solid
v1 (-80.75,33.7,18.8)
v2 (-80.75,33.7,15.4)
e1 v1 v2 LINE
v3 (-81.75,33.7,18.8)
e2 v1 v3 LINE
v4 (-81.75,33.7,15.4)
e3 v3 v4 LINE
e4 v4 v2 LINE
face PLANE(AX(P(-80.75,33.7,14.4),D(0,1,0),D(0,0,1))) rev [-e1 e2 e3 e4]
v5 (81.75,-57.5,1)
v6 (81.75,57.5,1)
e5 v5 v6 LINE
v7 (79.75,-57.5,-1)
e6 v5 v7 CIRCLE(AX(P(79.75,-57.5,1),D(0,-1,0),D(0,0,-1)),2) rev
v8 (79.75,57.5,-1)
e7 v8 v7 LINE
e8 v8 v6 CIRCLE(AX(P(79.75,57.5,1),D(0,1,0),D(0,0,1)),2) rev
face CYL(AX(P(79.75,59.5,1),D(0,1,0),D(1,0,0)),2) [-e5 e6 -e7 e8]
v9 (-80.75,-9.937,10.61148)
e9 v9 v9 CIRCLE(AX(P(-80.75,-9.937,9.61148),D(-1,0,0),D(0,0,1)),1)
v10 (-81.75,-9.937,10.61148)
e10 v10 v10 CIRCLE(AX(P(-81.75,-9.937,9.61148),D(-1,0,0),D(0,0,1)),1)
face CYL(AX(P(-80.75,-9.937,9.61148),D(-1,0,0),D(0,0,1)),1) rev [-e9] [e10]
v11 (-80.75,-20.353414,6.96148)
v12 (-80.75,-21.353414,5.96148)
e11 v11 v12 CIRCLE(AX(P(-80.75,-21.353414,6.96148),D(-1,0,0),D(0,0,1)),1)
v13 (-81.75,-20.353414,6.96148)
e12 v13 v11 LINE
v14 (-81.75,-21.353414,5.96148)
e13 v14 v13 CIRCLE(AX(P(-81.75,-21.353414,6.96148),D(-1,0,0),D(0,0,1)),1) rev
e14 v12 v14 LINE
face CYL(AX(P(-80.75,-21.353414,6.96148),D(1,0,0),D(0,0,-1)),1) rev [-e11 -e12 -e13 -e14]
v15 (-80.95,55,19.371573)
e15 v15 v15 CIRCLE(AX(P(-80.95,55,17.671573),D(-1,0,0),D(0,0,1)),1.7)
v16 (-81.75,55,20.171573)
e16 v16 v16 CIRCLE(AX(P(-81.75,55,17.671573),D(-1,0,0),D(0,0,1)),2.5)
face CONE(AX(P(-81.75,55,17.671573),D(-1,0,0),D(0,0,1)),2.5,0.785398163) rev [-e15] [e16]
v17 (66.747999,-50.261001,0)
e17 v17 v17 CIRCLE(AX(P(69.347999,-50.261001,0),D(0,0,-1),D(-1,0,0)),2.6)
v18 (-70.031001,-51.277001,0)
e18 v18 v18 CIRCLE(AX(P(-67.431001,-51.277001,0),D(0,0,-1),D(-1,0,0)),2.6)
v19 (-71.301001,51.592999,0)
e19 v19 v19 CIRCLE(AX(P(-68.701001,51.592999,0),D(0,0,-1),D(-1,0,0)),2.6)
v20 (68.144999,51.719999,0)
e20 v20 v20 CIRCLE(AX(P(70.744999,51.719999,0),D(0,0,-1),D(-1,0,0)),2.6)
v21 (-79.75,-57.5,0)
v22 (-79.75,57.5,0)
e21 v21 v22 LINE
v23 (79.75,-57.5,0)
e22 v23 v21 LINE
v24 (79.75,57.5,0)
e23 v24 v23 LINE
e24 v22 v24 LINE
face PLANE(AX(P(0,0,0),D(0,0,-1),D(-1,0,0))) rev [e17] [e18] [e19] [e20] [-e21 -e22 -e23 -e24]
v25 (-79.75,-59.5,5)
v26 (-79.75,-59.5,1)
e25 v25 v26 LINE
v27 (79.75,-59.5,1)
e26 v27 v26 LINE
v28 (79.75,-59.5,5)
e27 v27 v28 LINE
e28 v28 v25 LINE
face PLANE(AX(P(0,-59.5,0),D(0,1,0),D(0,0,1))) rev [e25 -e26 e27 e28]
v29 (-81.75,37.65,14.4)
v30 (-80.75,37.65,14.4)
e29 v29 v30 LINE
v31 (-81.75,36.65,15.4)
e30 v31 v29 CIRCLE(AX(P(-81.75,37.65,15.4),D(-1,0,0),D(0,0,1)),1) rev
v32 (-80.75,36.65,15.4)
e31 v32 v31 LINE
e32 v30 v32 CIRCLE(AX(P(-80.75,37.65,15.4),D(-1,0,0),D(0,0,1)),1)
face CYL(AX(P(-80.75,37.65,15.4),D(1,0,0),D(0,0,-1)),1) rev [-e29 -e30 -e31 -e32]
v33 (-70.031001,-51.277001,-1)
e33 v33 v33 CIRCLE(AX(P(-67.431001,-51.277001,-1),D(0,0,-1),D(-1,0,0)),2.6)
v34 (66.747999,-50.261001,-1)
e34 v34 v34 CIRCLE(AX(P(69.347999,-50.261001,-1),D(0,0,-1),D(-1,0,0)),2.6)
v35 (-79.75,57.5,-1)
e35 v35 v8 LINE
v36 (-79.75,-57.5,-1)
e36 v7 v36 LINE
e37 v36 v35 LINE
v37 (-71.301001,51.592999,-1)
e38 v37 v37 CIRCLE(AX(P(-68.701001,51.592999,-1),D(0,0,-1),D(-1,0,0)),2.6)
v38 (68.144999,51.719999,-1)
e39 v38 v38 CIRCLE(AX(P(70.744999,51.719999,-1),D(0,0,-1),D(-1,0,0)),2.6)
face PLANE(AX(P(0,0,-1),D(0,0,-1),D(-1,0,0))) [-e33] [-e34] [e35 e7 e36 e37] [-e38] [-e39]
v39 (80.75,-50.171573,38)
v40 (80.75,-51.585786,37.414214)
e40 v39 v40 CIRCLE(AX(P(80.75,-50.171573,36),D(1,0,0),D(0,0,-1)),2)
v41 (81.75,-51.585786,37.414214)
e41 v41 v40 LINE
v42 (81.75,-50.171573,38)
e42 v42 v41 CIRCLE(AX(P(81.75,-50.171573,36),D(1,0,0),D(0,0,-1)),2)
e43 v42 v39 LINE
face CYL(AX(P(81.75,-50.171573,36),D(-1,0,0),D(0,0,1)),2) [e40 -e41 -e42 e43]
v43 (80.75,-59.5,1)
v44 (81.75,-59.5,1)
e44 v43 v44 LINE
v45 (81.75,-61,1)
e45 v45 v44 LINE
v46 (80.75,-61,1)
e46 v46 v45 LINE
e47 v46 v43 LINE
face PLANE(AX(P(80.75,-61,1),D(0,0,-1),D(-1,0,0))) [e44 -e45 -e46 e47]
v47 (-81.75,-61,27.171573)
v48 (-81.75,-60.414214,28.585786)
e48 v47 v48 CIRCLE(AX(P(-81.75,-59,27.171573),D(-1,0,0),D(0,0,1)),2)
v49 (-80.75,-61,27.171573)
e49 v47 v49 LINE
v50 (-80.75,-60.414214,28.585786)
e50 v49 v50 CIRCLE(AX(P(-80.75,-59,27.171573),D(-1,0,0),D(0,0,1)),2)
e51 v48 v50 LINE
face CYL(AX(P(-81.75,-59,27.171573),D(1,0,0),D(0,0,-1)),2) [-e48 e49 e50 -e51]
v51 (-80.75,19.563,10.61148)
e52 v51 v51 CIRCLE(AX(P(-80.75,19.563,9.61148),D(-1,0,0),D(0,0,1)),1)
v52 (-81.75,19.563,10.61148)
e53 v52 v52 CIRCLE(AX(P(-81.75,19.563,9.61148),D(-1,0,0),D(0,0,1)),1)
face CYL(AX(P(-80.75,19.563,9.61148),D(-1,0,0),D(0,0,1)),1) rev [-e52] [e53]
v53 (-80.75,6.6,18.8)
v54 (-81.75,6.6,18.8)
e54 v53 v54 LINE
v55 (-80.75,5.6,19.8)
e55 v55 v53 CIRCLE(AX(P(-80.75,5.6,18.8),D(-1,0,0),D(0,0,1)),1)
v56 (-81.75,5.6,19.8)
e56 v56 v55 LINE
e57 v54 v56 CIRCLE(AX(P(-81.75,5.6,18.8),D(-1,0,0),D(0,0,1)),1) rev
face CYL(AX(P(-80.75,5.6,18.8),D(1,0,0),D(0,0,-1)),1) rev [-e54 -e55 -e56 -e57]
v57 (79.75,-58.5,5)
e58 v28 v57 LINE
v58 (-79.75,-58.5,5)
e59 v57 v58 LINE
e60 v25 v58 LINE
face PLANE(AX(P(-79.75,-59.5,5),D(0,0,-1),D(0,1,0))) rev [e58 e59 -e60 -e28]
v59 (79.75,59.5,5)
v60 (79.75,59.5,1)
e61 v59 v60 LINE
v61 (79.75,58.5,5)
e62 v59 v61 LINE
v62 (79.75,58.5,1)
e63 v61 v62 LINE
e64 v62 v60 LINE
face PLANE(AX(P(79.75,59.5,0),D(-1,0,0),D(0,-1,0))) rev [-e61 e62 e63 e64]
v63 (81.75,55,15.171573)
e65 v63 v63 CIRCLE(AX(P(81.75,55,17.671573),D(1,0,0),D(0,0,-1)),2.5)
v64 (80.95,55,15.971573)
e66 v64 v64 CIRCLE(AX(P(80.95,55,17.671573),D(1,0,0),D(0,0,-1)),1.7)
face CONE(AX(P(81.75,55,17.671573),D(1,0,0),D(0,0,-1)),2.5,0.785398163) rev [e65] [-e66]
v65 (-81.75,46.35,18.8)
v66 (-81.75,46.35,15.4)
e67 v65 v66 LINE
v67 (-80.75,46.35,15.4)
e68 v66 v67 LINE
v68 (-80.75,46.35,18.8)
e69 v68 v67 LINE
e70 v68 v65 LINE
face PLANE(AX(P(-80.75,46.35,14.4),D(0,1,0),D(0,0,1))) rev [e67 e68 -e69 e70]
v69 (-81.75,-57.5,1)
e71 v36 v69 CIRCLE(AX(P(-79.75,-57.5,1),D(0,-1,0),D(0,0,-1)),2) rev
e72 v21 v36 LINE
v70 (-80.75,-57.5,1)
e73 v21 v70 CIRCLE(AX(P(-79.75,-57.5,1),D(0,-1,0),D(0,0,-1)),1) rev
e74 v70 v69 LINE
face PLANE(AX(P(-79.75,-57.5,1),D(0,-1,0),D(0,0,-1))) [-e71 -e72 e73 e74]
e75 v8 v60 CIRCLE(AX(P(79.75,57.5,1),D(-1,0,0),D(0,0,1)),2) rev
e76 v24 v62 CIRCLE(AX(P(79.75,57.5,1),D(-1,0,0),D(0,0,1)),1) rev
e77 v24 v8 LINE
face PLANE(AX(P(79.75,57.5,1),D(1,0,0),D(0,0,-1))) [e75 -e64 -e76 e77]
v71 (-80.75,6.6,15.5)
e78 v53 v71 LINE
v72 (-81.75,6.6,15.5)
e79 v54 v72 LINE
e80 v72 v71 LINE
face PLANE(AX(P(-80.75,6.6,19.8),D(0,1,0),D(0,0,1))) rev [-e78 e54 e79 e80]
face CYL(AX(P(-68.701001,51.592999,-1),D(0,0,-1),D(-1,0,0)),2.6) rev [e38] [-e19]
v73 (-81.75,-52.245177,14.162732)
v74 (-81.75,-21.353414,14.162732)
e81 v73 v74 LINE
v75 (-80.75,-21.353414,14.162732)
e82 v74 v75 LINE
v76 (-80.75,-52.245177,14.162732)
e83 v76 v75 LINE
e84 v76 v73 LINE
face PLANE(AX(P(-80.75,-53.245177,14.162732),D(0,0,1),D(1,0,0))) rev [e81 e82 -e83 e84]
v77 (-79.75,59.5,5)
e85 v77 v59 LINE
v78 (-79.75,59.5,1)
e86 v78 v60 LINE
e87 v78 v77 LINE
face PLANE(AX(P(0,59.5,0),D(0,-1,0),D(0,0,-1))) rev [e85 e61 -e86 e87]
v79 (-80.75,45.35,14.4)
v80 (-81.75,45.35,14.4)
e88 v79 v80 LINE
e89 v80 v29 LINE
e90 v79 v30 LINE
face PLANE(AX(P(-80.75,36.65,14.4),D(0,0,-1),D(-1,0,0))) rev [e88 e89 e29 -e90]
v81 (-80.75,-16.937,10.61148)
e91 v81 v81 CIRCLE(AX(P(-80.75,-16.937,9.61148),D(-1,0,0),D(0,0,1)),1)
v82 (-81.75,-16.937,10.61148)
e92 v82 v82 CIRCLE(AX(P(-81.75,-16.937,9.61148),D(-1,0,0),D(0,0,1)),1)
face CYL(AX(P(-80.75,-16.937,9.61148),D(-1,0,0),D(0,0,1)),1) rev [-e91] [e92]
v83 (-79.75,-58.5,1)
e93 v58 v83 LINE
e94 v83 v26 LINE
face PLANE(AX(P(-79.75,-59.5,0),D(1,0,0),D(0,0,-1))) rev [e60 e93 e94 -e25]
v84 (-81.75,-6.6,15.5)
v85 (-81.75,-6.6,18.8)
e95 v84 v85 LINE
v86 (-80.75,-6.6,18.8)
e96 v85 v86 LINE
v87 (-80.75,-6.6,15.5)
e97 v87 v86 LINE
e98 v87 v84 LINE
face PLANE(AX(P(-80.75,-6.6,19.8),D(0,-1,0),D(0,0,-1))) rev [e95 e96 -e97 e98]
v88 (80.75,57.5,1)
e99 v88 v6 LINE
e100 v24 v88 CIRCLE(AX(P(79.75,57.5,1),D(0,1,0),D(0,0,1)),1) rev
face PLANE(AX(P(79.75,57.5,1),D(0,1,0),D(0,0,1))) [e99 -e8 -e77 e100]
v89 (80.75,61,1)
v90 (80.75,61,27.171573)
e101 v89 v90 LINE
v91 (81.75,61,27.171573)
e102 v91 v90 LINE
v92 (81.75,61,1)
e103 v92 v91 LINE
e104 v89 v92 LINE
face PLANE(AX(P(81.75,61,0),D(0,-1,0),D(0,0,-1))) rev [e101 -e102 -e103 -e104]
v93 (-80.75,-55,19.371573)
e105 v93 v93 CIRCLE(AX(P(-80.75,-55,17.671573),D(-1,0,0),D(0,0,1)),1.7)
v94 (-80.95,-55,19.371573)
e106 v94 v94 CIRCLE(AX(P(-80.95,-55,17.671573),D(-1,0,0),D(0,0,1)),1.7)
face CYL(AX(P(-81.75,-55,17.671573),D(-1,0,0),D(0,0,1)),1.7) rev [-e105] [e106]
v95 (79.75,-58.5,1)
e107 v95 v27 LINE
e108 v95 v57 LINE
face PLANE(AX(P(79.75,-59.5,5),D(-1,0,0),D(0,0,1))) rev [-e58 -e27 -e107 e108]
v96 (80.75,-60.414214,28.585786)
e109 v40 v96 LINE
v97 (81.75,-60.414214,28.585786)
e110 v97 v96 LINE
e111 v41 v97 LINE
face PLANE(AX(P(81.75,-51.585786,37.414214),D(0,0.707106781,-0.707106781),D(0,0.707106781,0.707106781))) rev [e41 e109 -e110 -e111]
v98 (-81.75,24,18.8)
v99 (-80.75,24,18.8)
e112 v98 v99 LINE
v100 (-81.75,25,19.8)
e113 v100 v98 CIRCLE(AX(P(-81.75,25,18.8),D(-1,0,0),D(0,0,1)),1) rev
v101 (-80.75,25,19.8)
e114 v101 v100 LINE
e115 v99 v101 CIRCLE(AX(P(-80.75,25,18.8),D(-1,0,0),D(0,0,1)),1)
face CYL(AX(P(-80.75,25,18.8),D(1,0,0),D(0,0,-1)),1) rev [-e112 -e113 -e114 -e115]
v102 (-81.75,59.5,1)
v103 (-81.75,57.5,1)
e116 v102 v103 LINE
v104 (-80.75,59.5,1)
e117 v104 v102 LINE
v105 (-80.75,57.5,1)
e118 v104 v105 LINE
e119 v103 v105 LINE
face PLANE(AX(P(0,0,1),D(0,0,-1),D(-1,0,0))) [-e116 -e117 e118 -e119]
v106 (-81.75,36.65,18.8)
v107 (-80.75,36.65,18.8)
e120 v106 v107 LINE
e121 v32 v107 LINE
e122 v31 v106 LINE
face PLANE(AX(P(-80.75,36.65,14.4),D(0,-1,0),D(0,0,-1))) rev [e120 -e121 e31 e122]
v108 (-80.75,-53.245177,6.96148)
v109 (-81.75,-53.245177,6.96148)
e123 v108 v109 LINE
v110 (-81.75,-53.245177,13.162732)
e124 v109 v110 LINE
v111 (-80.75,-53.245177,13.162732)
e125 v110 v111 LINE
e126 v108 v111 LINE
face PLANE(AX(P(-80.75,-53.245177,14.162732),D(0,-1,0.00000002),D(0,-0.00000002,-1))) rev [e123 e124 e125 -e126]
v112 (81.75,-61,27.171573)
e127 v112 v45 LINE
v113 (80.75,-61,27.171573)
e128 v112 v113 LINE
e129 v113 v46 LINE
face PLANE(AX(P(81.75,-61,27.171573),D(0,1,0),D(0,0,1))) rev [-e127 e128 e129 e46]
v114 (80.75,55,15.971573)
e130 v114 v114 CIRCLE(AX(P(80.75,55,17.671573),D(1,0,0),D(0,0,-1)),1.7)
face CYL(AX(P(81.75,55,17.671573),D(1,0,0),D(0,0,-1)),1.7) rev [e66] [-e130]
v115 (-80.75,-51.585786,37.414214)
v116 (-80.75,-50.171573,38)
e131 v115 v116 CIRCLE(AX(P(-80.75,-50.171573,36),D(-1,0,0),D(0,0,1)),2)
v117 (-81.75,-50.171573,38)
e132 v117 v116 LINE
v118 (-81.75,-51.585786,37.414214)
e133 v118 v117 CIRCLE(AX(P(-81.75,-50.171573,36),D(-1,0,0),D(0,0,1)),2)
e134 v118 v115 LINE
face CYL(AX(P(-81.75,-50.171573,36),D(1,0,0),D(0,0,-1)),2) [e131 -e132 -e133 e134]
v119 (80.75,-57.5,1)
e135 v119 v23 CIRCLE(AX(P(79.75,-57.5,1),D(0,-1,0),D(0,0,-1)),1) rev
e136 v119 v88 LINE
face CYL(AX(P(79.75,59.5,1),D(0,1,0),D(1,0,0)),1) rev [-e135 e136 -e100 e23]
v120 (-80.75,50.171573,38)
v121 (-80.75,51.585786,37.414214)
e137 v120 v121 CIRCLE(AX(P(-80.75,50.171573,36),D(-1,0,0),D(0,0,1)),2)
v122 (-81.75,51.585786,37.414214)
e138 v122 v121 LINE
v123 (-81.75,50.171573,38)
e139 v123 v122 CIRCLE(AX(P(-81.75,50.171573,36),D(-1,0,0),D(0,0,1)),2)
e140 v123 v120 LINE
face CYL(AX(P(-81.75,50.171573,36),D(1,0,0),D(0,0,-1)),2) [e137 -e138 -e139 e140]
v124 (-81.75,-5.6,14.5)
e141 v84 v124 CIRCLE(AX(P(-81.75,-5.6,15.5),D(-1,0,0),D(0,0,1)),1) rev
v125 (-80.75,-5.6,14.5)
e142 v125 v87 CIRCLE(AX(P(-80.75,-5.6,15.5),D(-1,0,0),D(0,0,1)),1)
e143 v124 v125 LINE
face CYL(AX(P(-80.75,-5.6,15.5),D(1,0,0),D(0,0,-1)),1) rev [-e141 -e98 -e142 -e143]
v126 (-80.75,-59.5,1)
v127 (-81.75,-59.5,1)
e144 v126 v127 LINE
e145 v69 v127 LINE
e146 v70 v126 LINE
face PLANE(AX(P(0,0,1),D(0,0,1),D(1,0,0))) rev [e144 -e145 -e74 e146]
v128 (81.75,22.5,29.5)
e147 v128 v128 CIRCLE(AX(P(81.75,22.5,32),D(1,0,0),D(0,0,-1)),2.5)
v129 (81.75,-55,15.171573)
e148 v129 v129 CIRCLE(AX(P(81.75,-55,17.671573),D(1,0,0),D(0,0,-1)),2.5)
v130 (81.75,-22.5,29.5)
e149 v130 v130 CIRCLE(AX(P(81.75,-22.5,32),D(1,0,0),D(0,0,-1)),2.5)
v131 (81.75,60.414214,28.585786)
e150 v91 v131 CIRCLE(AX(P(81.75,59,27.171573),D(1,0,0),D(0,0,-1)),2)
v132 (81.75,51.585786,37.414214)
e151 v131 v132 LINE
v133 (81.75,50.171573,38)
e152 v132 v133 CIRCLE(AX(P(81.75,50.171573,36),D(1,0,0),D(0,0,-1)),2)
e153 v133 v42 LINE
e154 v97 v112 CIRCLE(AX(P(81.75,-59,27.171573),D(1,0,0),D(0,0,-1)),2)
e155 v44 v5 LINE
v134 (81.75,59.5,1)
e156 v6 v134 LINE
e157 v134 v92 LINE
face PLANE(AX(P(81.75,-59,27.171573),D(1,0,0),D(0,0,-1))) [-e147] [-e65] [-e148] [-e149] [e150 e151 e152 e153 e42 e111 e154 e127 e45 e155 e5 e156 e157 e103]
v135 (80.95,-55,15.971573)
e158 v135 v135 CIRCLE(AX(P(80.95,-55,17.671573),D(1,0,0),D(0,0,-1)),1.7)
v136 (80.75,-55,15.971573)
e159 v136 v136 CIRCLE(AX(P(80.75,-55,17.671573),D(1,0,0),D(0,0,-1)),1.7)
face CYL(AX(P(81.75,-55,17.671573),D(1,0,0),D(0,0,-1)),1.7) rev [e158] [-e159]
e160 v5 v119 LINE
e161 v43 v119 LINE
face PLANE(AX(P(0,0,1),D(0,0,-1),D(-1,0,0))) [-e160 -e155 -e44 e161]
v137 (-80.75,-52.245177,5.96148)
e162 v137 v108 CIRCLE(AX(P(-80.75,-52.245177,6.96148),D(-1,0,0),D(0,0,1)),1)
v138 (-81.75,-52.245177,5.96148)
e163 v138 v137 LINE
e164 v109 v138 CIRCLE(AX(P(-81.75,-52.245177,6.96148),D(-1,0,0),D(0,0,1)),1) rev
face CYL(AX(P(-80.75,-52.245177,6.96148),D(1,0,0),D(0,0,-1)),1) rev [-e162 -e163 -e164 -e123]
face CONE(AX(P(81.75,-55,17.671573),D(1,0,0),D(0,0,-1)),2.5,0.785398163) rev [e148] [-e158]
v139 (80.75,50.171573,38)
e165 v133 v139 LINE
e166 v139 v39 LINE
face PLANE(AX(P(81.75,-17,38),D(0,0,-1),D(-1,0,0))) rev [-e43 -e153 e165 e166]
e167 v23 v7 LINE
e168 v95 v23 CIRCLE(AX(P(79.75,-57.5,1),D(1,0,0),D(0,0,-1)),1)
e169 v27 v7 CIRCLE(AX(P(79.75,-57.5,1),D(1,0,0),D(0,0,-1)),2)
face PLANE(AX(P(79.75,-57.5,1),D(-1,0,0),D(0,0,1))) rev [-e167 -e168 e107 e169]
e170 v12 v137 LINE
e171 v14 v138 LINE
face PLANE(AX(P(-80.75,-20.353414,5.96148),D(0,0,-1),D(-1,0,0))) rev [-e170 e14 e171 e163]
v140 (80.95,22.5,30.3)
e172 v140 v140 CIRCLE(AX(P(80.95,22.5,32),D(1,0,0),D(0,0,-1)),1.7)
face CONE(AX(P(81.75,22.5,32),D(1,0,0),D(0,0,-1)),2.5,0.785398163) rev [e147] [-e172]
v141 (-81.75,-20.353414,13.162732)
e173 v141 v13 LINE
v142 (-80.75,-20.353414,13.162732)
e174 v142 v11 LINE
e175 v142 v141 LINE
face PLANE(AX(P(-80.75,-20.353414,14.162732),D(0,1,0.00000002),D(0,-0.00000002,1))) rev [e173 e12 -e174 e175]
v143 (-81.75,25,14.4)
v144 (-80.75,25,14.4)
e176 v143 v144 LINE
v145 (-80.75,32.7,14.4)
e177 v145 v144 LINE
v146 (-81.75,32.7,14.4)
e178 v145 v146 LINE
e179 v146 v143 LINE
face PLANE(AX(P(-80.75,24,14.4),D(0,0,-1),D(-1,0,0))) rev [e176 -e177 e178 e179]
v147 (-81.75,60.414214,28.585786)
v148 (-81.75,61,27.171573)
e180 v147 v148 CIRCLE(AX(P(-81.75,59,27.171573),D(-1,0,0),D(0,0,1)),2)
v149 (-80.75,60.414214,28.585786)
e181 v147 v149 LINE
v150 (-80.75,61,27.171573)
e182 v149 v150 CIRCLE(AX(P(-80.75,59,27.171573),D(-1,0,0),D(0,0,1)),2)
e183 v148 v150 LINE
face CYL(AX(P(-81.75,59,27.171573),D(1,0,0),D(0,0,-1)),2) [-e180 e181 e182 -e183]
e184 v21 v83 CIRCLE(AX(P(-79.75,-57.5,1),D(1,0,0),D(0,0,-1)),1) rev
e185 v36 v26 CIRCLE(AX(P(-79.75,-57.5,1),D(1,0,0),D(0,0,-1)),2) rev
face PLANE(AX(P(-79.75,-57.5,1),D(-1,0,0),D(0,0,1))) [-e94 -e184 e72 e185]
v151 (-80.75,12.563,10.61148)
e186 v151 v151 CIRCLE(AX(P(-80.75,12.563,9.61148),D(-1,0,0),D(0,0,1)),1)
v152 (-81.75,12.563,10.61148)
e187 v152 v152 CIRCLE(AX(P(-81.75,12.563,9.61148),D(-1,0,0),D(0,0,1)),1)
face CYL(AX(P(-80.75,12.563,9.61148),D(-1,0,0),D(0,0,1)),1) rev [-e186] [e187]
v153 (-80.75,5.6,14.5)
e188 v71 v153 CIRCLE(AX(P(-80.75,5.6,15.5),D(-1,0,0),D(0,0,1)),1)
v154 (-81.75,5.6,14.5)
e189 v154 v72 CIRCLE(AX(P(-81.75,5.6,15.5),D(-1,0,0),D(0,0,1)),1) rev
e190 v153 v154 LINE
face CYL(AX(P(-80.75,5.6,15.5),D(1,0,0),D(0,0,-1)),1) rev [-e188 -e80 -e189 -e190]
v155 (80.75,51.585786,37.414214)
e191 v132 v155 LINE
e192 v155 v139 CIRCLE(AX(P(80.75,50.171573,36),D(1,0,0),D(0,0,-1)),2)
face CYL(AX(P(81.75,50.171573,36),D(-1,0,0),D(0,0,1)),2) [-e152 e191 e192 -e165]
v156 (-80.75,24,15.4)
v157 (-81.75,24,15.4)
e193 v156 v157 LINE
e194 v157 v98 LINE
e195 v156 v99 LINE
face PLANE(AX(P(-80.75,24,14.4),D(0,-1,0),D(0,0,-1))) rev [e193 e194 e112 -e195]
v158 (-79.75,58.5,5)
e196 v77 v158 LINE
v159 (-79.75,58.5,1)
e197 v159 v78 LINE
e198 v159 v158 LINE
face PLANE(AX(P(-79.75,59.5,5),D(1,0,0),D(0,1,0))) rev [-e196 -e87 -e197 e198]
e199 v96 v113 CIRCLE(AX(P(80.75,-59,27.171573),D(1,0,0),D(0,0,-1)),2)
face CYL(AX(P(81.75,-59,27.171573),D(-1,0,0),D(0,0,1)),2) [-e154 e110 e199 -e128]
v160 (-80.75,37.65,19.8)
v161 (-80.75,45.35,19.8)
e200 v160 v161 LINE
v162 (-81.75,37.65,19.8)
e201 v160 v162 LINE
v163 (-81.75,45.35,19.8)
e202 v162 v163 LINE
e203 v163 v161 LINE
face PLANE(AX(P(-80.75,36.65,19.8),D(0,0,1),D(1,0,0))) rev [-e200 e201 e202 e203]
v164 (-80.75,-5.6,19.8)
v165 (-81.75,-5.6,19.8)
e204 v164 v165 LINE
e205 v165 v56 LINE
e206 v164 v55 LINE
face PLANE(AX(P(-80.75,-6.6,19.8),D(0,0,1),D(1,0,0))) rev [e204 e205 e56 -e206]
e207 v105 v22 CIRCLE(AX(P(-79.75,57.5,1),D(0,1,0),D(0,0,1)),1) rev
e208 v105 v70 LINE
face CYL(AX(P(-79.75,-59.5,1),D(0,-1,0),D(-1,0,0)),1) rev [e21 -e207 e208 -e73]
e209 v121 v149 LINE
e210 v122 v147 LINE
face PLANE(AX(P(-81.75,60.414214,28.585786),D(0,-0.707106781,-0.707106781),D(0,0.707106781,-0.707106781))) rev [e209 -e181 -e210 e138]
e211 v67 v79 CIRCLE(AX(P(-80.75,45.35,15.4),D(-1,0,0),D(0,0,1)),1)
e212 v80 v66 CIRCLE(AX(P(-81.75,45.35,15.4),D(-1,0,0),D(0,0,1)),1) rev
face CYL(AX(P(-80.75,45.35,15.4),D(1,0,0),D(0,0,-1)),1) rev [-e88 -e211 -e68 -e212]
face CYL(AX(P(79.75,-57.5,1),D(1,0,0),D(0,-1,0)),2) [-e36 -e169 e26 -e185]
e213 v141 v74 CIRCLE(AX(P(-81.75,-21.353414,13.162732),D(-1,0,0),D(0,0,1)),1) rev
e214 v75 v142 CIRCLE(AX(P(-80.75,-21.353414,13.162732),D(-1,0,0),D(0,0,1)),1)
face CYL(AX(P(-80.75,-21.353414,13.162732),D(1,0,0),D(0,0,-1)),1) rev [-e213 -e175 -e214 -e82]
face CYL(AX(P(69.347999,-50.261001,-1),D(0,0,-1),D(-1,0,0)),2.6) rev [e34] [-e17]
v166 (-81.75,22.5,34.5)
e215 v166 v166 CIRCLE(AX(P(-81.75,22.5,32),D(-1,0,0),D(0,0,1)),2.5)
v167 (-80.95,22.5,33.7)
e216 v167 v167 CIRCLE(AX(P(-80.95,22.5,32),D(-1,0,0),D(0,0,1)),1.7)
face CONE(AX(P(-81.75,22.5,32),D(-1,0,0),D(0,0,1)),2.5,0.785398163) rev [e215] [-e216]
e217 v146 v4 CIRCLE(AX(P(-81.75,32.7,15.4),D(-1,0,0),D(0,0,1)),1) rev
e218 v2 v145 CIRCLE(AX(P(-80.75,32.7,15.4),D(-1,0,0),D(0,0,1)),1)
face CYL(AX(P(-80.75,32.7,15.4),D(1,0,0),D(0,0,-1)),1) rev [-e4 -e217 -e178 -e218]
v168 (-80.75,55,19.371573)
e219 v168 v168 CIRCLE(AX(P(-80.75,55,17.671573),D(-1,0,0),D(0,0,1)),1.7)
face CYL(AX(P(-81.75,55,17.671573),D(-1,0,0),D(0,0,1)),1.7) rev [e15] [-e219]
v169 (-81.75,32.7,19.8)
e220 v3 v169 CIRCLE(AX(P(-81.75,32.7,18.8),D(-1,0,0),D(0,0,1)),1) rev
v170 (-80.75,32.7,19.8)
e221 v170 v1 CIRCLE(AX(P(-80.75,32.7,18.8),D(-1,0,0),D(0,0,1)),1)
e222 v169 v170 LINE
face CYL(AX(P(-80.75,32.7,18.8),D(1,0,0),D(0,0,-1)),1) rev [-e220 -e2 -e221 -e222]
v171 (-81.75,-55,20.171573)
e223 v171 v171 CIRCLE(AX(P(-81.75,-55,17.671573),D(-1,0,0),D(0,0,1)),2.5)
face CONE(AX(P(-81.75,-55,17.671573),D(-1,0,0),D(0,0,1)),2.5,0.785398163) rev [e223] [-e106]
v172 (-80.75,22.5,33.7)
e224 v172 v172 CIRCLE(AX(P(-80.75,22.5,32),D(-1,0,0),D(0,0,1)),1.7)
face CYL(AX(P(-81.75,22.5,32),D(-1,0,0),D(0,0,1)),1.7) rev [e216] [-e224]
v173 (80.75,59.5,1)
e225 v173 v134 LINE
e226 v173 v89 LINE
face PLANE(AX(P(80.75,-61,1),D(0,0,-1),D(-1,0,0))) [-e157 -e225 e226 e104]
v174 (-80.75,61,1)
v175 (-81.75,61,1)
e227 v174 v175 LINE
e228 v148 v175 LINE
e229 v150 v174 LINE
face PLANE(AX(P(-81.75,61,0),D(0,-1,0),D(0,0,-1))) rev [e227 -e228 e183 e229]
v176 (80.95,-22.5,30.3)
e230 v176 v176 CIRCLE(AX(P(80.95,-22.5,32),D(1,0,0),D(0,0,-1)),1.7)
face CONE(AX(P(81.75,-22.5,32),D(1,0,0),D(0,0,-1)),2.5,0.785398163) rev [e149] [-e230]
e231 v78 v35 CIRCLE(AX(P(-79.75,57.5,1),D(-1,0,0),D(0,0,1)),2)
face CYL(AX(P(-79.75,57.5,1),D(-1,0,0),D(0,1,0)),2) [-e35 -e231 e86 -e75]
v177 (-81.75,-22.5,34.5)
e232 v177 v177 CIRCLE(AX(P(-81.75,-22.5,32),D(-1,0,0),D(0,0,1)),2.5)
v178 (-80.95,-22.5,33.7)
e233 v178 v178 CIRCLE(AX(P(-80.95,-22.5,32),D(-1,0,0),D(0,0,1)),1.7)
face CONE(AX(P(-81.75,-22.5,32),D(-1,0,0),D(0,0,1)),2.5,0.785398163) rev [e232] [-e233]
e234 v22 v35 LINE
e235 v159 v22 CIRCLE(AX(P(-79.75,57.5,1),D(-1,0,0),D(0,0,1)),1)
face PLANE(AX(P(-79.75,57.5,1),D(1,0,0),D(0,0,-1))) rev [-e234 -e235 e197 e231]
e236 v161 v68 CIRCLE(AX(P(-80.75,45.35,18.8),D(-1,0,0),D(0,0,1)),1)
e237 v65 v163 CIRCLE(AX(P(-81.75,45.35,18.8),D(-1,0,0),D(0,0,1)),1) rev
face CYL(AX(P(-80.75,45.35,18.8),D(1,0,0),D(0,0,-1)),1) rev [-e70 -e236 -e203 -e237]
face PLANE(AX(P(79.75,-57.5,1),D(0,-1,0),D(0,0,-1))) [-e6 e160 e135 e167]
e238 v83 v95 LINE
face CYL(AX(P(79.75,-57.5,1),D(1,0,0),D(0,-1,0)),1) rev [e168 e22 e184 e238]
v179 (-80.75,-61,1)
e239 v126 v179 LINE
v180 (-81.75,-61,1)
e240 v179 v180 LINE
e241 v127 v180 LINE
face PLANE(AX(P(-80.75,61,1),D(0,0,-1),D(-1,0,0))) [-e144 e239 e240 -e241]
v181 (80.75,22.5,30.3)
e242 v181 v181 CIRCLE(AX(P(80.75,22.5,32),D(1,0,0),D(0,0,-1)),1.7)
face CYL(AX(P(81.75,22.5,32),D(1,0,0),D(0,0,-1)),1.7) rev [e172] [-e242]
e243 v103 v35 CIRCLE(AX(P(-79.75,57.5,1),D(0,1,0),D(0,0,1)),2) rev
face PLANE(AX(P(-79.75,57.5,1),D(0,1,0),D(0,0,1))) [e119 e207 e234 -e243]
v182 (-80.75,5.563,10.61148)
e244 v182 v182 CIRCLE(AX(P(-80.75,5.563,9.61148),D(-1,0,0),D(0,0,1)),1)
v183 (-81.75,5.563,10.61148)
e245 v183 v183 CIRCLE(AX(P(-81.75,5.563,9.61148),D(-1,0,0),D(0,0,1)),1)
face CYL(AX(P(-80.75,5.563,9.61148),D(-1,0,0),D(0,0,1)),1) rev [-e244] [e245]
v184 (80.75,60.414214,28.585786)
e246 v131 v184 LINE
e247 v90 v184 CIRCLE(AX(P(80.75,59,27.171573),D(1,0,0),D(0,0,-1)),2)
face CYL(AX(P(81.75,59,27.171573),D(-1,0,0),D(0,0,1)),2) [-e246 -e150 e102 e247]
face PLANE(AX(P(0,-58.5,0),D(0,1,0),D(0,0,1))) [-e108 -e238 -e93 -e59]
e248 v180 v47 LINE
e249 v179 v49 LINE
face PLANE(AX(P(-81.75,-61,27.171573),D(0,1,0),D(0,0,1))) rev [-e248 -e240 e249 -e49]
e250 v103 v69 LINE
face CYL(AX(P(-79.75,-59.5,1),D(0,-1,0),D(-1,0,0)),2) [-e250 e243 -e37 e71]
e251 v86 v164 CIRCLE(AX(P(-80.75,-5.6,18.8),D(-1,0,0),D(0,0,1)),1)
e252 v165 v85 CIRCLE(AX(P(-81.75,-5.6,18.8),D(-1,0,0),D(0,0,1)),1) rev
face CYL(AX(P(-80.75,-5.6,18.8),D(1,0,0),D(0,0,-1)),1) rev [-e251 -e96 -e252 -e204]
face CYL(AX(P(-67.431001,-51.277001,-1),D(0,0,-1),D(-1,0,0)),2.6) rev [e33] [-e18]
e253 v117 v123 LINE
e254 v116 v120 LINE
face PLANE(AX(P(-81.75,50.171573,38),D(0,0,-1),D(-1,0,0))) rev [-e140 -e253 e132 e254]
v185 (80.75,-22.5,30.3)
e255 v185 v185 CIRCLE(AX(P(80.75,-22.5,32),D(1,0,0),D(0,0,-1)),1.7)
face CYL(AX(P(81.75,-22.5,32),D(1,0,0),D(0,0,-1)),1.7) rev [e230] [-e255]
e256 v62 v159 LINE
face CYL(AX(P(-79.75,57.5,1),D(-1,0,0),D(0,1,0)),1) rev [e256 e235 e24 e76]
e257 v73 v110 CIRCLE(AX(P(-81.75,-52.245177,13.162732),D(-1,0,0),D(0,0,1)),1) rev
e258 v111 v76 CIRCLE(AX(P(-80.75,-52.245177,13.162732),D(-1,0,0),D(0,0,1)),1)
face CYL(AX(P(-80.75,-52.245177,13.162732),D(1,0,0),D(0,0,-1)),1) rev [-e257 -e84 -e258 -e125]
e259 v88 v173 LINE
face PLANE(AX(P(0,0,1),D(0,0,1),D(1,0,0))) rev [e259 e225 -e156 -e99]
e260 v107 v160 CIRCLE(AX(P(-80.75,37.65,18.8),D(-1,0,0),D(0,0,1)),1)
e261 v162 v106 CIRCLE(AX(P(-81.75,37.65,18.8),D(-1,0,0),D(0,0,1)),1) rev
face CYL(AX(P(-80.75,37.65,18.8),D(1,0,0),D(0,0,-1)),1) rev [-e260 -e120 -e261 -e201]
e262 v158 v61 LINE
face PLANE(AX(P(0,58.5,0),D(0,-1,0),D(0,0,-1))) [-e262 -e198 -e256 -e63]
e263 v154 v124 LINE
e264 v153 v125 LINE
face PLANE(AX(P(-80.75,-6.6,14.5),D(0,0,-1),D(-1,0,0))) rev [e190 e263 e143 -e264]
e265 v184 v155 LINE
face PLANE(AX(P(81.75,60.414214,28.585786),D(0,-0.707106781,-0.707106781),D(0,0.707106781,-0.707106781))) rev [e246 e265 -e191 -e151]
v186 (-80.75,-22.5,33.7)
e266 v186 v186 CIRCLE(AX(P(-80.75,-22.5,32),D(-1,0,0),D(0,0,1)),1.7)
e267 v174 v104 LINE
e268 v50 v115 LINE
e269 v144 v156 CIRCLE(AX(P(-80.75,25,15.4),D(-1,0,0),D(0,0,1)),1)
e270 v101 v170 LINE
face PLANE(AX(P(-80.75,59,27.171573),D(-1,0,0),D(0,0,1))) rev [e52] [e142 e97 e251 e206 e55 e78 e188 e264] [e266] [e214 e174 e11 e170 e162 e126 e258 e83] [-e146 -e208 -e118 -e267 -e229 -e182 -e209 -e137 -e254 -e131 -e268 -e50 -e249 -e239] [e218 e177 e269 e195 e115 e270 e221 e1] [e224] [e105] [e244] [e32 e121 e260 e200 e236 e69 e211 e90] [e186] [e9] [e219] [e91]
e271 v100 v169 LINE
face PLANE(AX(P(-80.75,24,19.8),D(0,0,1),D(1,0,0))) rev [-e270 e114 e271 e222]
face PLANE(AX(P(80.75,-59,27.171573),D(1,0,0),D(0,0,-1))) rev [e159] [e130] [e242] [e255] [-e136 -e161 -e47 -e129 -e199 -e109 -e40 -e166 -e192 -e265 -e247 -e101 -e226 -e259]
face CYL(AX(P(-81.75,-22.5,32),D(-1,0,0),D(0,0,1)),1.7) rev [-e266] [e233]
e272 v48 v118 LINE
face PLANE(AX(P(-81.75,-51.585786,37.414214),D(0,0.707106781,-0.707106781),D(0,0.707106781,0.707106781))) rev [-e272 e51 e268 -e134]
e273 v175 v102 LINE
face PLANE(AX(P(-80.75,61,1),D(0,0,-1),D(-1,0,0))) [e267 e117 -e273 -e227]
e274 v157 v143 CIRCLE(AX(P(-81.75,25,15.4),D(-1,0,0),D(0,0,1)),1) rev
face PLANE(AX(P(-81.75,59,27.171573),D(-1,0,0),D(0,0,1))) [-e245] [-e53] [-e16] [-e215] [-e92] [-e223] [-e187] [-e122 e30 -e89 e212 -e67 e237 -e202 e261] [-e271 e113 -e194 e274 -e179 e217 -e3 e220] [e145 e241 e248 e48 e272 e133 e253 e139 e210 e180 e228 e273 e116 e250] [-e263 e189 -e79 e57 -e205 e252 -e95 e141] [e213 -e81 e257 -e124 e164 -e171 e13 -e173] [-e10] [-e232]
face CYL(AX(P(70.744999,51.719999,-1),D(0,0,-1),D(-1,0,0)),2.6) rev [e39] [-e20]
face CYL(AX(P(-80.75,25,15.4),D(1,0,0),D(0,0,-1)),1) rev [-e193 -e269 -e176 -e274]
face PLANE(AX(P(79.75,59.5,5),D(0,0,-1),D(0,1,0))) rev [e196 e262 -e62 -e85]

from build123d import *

# Parameters (mm, degrees)
SKETCH1_W                                      = 160.5
SKETCH1_H                                      = 119
BASE_FLANGE1_DEPTH                             = 1
EDGE_FLANGE1_STRIP_W                           = 6.5
EDGE_FLANGE1_STRIP_H                           = 1
EDGE_FLANGE1_STRIP_CUT_DEPTH                   = 119
EDGE_FLANGE1_STRIP_2_W                         = 6.5
EDGE_FLANGE1_STRIP_2_H                         = 1
EDGE_FLANGE1_STRIP_CUT_2_DEPTH                 = 119
EDGE_FLANGE1_DEPTH                             = 119
EDGE_FLANGE1_START                             = 1
EDGE_FLANGE1_FLAT_DEPTH                        = 1
EDGE_FLANGE1_BEND_DEPTH                        = 119
EDGE_FLANGE1_FLAT_2_DEPTH                      = 1
CSK_FOR_M3_FLAT_HEAD_MACHINE_SCREW2_AT_2_COUNT = 2
CSK_FOR_M3_FLAT_HEAD_MACHINE_SCREW2_AT_2_PITCH = 35.518358969
CSK_FOR_M3_FLAT_HEAD_MACHINE_SCREW2_AT_3_COUNT = 2
CSK_FOR_M3_FLAT_HEAD_MACHINE_SCREW2_AT_3_PITCH = 45
CSK_FOR_M3_FLAT_HEAD_MACHINE_SCREW2_AT_4_COUNT = 2
CSK_FOR_M3_FLAT_HEAD_MACHINE_SCREW2_AT_4_PITCH = 78.813411447
F_5_2_5_2_DIAMETER_HOLE1_D                     = 5.2
F_5_2_5_2_DIAMETER_HOLE1_DEPTH                 = 14
F_5_2_5_2_DIAMETER_HOLE1_TIP                   = 1.562237609
SKETCH17_R                                     = 1
SKETCH17_W                                     = 5.4
SKETCH17_H                                     = 9.7
SKETCH17_W_2                                   = 5.3
SKETCH17_H_2                                   = 13.2
CUT_EXTRUDE1_DEPTH                             = 1
FILLET1_R                                      = 1
EDGE_FLANGE2_START                             = -81.75
EDGE_FLANGE2_DEPTH                             = 163.5
EDGE_FLANGE2_2_DEPTH                           = 2
EDGE_FLANGE2_START_2                           = 79.75
EDGE_FLANGE2_3_DEPTH                           = 2
EDGE_FLANGE2_START_3                           = -79.75
EDGE_FLANGE2_4_DEPTH                           = 159.5


# Read off the part's stored shape, not the designer's step: Edge-Flange2
# Sheet-metal steps are written as plain solids
with BuildPart() as part:
    # Sketch1 → Base-Flange1 (new body)
    with BuildSketch(Plane.XY):
        Rectangle(SKETCH1_W, SKETCH1_H)
    extrude(amount=-BASE_FLANGE1_DEPTH)

    # Edge-Flange1 strip (across the edge) → Edge-Flange1 strip cut (cut)
    with BuildSketch(Plane(origin=(-80.75, 59.5, 0), x_dir=(1, 0, 0), z_dir=(0, -1, 0))):
        with Locations((-2.25, -0.5)):
            Rectangle(EDGE_FLANGE1_STRIP_W, EDGE_FLANGE1_STRIP_H)
    extrude(amount=EDGE_FLANGE1_STRIP_CUT_DEPTH, mode=Mode.SUBTRACT)

    # Edge-Flange1 strip 2 (across the edge) → Edge-Flange1 strip cut 2 (cut)
    with BuildSketch(Plane(origin=(80.75, -59.5, 0), x_dir=(-1, 0, 0), z_dir=(0, 1, 0))):
        with Locations((-2.25, -0.5)):
            Rectangle(EDGE_FLANGE1_STRIP_2_W, EDGE_FLANGE1_STRIP_2_H)
    extrude(amount=EDGE_FLANGE1_STRIP_CUT_2_DEPTH, mode=Mode.SUBTRACT)

    # Edge-Flange1 bend section (across the edge) → Edge-Flange1 (add)
    with BuildSketch(Plane(origin=(-80.75, 59.5, 0), x_dir=(1, 0, 0), z_dir=(0, -1, 0))):
        with BuildLine():
            Line((-1, 1), (0, 1))
            ThreePointArc((0, 1), (0.292893219, 0.292893219), (1, 0))
            Line((1, 0), (1, -1))
            ThreePointArc((1, -1), (-0.414213562, -0.414213562), (-1, 1))
        make_face()
    extrude(amount=EDGE_FLANGE1_DEPTH)

    # Edge-Flange1 profile (on flange) → Edge-Flange1 flat (add)
    with BuildSketch(Plane(origin=(-80.75, 0, 0), x_dir=(0, -1, 0), z_dir=(-1, 0, 0)).offset(EDGE_FLANGE1_START)):
        with BuildLine():
            Line((-61, 27.171572875), (-61, 1))
            Line((-61, 1), (61, 1))
            Line((61, 1), (61, 27.171572875))
            ThreePointArc((61, 27.171572875), (60.847759065, 27.93693974), (60.414213562, 28.585786438))
            Line((60.414213562, 28.585786438), (51.585786438, 37.414213562))
            ThreePointArc((51.585786438, 37.414213562), (50.93693974, 37.847759065), (50.171572875, 38))
            Line((50.171572875, 38), (17, 38))
            Line((17, 38), (-16, 38))
            Line((-16, 38), (-50.171572875, 38))
            ThreePointArc((-50.171572875, 38), (-50.93693974, 37.847759065), (-51.585786438, 37.414213562))
            Line((-51.585786438, 37.414213562), (-60.414213562, 28.585786438))
            ThreePointArc((-60.414213562, 28.585786438), (-60.847759065, 27.93693974), (-61, 27.171572875))
        make_face()
    extrude(amount=-EDGE_FLANGE1_FLAT_DEPTH)

    # Edge-Flange1 bend section 2 (across the edge) → Edge-Flange1 bend (add)
    with BuildSketch(Plane(origin=(80.75, -59.5, 0), x_dir=(-1, 0, 0), z_dir=(0, 1, 0))):
        with BuildLine():
            Line((-1, 1), (0, 1))
            ThreePointArc((0, 1), (0.292893219, 0.292893219), (1, 0))
            Line((1, 0), (1, -1))
            ThreePointArc((1, -1), (-0.414213562, -0.414213562), (-1, 1))
        make_face()
    extrude(amount=EDGE_FLANGE1_BEND_DEPTH)

    # Edge-Flange1 profile 2 (on flange) → Edge-Flange1 flat 2 (add)
    with BuildSketch(Plane.YZ.offset(80.75).offset(EDGE_FLANGE1_START)):
        with BuildLine():
            ThreePointArc((-60.414213562, 28.585786438), (-60.847759065, 27.93693974), (-61, 27.171572875))
            Line((-61, 27.171572875), (-61, 1))
            Line((-61, 1), (61, 1))
            Line((61, 1), (61, 27.171572875))
            ThreePointArc((61, 27.171572875), (60.847759065, 27.93693974), (60.414213562, 28.585786438))
            Line((60.414213562, 28.585786438), (51.585786438, 37.414213562))
            ThreePointArc((51.585786438, 37.414213562), (50.93693974, 37.847759065), (50.171572875, 38))
            Line((50.171572875, 38), (16, 38))
            Line((16, 38), (-17, 38))
            Line((-17, 38), (-50.171572875, 38))
            ThreePointArc((-50.171572875, 38), (-50.93693974, 37.847759065), (-51.585786438, 37.414213562))
            Line((-51.585786438, 37.414213562), (-60.414213562, 28.585786438))
        make_face()
    extrude(amount=-EDGE_FLANGE1_FLAT_2_DEPTH)

    # Sketch11 → CSK for M3 Flat Head Machine Screw2 (revolve, cut)
    with BuildSketch(Plane(origin=(-81.75, 22.5, 32), x_dir=(0, 0, 1), z_dir=(0, 1, 0))):
        Polygon((0, 0), (0, 15.021463052), (1.7, 14), (1.7, 0.8), (2.5, 0), align=None)
    csk_for_m3_flat_head_machine_screw2 = revolve(axis=Axis((-88.1, 22.5, 32), (1, 0, 0)), mode=Mode.SUBTRACT)

    # CSK for M3 Flat Head Machine Screw2 at 2: CSK for M3 Flat Head Machine Screw2 ×2
    with Locations(*[Vector(1.4003459885704356e-15, 0.9150197515636448, -0.40340904086101714) * (i * CSK_FOR_M3_FLAT_HEAD_MACHINE_SCREW2_AT_2_PITCH) for i in range(1, CSK_FOR_M3_FLAT_HEAD_MACHINE_SCREW2_AT_2_COUNT)]):
        add(csk_for_m3_flat_head_machine_screw2, mode=Mode.SUBTRACT)

    # CSK for M3 Flat Head Machine Screw2 at 3: CSK for M3 Flat Head Machine Screw2 ×2
    with Locations(*[(0, -i * CSK_FOR_M3_FLAT_HEAD_MACHINE_SCREW2_AT_3_PITCH, 0) for i in range(1, CSK_FOR_M3_FLAT_HEAD_MACHINE_SCREW2_AT_3_COUNT)]):
        add(csk_for_m3_flat_head_machine_screw2, mode=Mode.SUBTRACT)

    # CSK for M3 Flat Head Machine Screw2 at 4: CSK for M3 Flat Head Machine Screw2 ×2
    with Locations(*[Vector(0, -0.9833351783331594, -0.18180188957349616) * (i * CSK_FOR_M3_FLAT_HEAD_MACHINE_SCREW2_AT_4_PITCH) for i in range(1, CSK_FOR_M3_FLAT_HEAD_MACHINE_SCREW2_AT_4_COUNT)]):
        add(csk_for_m3_flat_head_machine_screw2, mode=Mode.SUBTRACT)

    # Mirror1: CSK for M3 Flat Head Machine Screw2 across plane
    add(csk_for_m3_flat_head_machine_screw2.mirror(Plane(origin=(0, 0, 0), x_dir=(0, 0, 1), z_dir=(1, 0, 0))), mode=Mode.SUBTRACT)

    # Mirror1 copy 1 sketch → Mirror1 copy 1 (revolve, cut)
    with BuildSketch(Plane(origin=(81.75, 55, 17.671572875), x_dir=(0, 0, 1), z_dir=(0, 1, 0))):
        Polygon((0, 0), (0, -15.021463052), (1.7, -14), (1.7, -0.8), (2.5, 0), align=None)
    revolve(axis=Axis((88.1, 55, 17.671572875), (1, 0, 0)), mode=Mode.SUBTRACT)

    # Mirror1 copy 2 sketch → Mirror1 copy 2 (revolve, cut)
    with BuildSketch(Plane(origin=(81.75, -22.5, 32), x_dir=(0, 0, 1), z_dir=(0, 1, 0))):
        Polygon((0, 0), (0, -15.021463052), (1.7, -14), (1.7, -0.8), (2.5, 0), align=None)
    revolve(axis=Axis((88.1, -22.5, 32), (1, 0, 0)), mode=Mode.SUBTRACT)

    # Mirror1 copy 3 sketch → Mirror1 copy 3 (revolve, cut)
    with BuildSketch(Plane(origin=(81.75, -55, 17.671572875), x_dir=(0, 0, 1), z_dir=(0, 1, 0))):
        Polygon((0, 0), (0, -15.021463052), (1.7, -14), (1.7, -0.8), (2.5, 0), align=None)
    revolve(axis=Axis((88.1, -55, 17.671572875), (1, 0, 0)), mode=Mode.SUBTRACT)

    # Ø5.2 (5.2) Diameter Hole1
    with Locations(Plane(origin=(0, 0, -1), x_dir=(-1, 0, 0), z_dir=(0, 0, -1))):
        with Locations((-70.74499876, 51.71999943), (-69.34799876, -50.26100057), (67.43100124, -51.27700057), (68.70100124, 51.59299943)):
            Hole(F_5_2_5_2_DIAMETER_HOLE1_D / 2, depth=F_5_2_5_2_DIAMETER_HOLE1_DEPTH)
            with Locations((0, 0, -(F_5_2_5_2_DIAMETER_HOLE1_DEPTH + F_5_2_5_2_DIAMETER_HOLE1_TIP / 2))):  # 118° drill point
                Cone(0, F_5_2_5_2_DIAMETER_HOLE1_D / 2, F_5_2_5_2_DIAMETER_HOLE1_TIP, mode=Mode.SUBTRACT)

    # Sketch17 → Cut-Extrude1 (cut)
    with BuildSketch(Plane.ZY.offset(81.75)):
        with Locations((9.61148, -16.93699963)):
            Circle(SKETCH17_R)
        with Locations((9.61148, -9.93699963)):
            Circle(SKETCH17_R)
        with Locations((9.61148, 5.56300037)):
            Circle(SKETCH17_R)
        with Locations((9.61148, 12.56300037)):
            Circle(SKETCH17_R)
        with Locations((9.61148, 19.56300037)):
            Circle(SKETCH17_R)
        with Locations((17.1, 41.5)):
            Rectangle(SKETCH17_W, SKETCH17_H)
        with Locations((17.15, 0)):
            Rectangle(SKETCH17_W_2, SKETCH17_H_2)
        Polygon((14.162732109, -53.24517671), (14.162732109, -20.353414123), (5.96148, -20.35341396), (5.96148, -53.245176873), align=None)
        with Locations((17.1, 28.85)):
            Rectangle(SKETCH17_W, SKETCH17_H)
    extrude(amount=-CUT_EXTRUDE1_DEPTH, mode=Mode.SUBTRACT)

    # Fillet1
    fillet1_edges = [part.edges().sort_by_distance(p)[0] for p in [
        (-81.25, -6.6, 19.8),
        (-81.25, -6.6, 14.5),
        (-81.25, 6.6, 14.5),
        (-81.25, 6.6, 19.8),
        (-81.25, -53.24517671, 14.162732109),
        (-81.25, -53.245176873, 5.96148),
        (-81.25, -20.35341396, 5.96148),
        (-81.25, -20.353414123, 14.162732109),
        (-81.25, 33.7, 14.4),
        (-81.25, 33.7, 19.8),
        (-81.25, 24, 19.8),
        (-81.25, 24, 14.4),
        (-81.25, 46.35, 19.8),
        (-81.25, 36.65, 19.8),
        (-81.25, 36.65, 14.4),
        (-81.25, 46.35, 14.4),
    ]]
    fillet(fillet1_edges, radius=FILLET1_R)

    # Edge-Flange2 outline → Edge-Flange2 (cut)
    with BuildSketch(Plane.YZ.offset(EDGE_FLANGE2_START)):
        with BuildLine():
            Line((-59.5, 1), (-59.5, -1))
            Line((-59.5, -1), (-57.5, -1))
            ThreePointArc((-57.5, -1), (-58.914213562, -0.414213562), (-59.5, 1))
        make_face()
        with BuildLine():
            Line((-57.5, 1), (-58.5, 1))
            ThreePointArc((-58.5, 1), (-58.207106781, 0.292893219), (-57.5, 0))
            Line((-57.5, 0), (-57.5, 1))
        make_face()
        with BuildLine():
            Line((57.5, 1), (57.5, 0))
            ThreePointArc((57.5, 0), (58.207106781, 0.292893219), (58.5, 1))
            Line((58.5, 1), (57.5, 1))
        make_face()
        with BuildLine():
            Line((57.5, -1), (59.5, -1))
            Line((59.5, -1), (59.5, 1))
            ThreePointArc((59.5, 1), (58.914213562, -0.414213562), (57.5, -1))
        make_face()
    extrude(amount=EDGE_FLANGE2_DEPTH, mode=Mode.SUBTRACT)

    # Edge-Flange2 2 outline → Edge-Flange2 2 (cut)
    with BuildSketch(Plane.YZ.offset(EDGE_FLANGE2_START)):
        with BuildLine():
            Line((-58.5, 1), (-59.5, 1))
            ThreePointArc((-59.5, 1), (-58.914213562, -0.414213562), (-57.5, -1))
            Line((-57.5, -1), (-57.5, 0))
            ThreePointArc((-57.5, 0), (-58.207106781, 0.292893219), (-58.5, 1))
        make_face()
        with BuildLine():
            ThreePointArc((57.5, -1), (58.914213562, -0.414213562), (59.5, 1))
            Line((59.5, 1), (58.5, 1))
            ThreePointArc((58.5, 1), (58.207106781, 0.292893219), (57.5, 0))
            Line((57.5, 0), (57.5, -1))
        make_face()
    extrude(amount=EDGE_FLANGE2_2_DEPTH, mode=Mode.SUBTRACT)

    # Edge-Flange2 3 outline → Edge-Flange2 3 (cut)
    with BuildSketch(Plane.YZ.offset(EDGE_FLANGE2_START_2)):
        with BuildLine():
            Line((-58.5, 1), (-59.5, 1))
            ThreePointArc((-59.5, 1), (-58.914213562, -0.414213562), (-57.5, -1))
            Line((-57.5, -1), (-57.5, 0))
            ThreePointArc((-57.5, 0), (-58.207106781, 0.292893219), (-58.5, 1))
        make_face()
        with BuildLine():
            ThreePointArc((57.5, -1), (58.914213562, -0.414213562), (59.5, 1))
            Line((59.5, 1), (58.5, 1))
            ThreePointArc((58.5, 1), (58.207106781, 0.292893219), (57.5, 0))
            Line((57.5, 0), (57.5, -1))
        make_face()
    extrude(amount=EDGE_FLANGE2_3_DEPTH, mode=Mode.SUBTRACT)

    # Edge-Flange2 4 outline → Edge-Flange2 4 (add)
    with BuildSketch(Plane.YZ.offset(EDGE_FLANGE2_START_3)):
        with BuildLine():
            Line((-59.5, 5), (-59.5, 1))
            ThreePointArc((-59.5, 1), (-59.431851652, 0.48236191), (-59.232050807, 0))
            Line((-59.232050807, 0), (-57.5, 0))
            ThreePointArc((-57.5, 0), (-58.207106781, 0.292893219), (-58.5, 1))
            Line((-58.5, 1), (-58.5, 5))
            Line((-58.5, 5), (-59.5, 5))
        make_face()
        with BuildLine():
            ThreePointArc((58.5, 1), (58.207106781, 0.292893219), (57.5, 0))
            Line((57.5, 0), (59.232050807, 0))
            ThreePointArc((59.232050807, 0), (59.431851652, 0.48236191), (59.5, 1))
            Line((59.5, 1), (59.5, 5))
            Line((59.5, 5), (58.5, 5))
            Line((58.5, 5), (58.5, 1))
        make_face()
    extrude(amount=EDGE_FLANGE2_4_DEPTH)


solid = part.part
